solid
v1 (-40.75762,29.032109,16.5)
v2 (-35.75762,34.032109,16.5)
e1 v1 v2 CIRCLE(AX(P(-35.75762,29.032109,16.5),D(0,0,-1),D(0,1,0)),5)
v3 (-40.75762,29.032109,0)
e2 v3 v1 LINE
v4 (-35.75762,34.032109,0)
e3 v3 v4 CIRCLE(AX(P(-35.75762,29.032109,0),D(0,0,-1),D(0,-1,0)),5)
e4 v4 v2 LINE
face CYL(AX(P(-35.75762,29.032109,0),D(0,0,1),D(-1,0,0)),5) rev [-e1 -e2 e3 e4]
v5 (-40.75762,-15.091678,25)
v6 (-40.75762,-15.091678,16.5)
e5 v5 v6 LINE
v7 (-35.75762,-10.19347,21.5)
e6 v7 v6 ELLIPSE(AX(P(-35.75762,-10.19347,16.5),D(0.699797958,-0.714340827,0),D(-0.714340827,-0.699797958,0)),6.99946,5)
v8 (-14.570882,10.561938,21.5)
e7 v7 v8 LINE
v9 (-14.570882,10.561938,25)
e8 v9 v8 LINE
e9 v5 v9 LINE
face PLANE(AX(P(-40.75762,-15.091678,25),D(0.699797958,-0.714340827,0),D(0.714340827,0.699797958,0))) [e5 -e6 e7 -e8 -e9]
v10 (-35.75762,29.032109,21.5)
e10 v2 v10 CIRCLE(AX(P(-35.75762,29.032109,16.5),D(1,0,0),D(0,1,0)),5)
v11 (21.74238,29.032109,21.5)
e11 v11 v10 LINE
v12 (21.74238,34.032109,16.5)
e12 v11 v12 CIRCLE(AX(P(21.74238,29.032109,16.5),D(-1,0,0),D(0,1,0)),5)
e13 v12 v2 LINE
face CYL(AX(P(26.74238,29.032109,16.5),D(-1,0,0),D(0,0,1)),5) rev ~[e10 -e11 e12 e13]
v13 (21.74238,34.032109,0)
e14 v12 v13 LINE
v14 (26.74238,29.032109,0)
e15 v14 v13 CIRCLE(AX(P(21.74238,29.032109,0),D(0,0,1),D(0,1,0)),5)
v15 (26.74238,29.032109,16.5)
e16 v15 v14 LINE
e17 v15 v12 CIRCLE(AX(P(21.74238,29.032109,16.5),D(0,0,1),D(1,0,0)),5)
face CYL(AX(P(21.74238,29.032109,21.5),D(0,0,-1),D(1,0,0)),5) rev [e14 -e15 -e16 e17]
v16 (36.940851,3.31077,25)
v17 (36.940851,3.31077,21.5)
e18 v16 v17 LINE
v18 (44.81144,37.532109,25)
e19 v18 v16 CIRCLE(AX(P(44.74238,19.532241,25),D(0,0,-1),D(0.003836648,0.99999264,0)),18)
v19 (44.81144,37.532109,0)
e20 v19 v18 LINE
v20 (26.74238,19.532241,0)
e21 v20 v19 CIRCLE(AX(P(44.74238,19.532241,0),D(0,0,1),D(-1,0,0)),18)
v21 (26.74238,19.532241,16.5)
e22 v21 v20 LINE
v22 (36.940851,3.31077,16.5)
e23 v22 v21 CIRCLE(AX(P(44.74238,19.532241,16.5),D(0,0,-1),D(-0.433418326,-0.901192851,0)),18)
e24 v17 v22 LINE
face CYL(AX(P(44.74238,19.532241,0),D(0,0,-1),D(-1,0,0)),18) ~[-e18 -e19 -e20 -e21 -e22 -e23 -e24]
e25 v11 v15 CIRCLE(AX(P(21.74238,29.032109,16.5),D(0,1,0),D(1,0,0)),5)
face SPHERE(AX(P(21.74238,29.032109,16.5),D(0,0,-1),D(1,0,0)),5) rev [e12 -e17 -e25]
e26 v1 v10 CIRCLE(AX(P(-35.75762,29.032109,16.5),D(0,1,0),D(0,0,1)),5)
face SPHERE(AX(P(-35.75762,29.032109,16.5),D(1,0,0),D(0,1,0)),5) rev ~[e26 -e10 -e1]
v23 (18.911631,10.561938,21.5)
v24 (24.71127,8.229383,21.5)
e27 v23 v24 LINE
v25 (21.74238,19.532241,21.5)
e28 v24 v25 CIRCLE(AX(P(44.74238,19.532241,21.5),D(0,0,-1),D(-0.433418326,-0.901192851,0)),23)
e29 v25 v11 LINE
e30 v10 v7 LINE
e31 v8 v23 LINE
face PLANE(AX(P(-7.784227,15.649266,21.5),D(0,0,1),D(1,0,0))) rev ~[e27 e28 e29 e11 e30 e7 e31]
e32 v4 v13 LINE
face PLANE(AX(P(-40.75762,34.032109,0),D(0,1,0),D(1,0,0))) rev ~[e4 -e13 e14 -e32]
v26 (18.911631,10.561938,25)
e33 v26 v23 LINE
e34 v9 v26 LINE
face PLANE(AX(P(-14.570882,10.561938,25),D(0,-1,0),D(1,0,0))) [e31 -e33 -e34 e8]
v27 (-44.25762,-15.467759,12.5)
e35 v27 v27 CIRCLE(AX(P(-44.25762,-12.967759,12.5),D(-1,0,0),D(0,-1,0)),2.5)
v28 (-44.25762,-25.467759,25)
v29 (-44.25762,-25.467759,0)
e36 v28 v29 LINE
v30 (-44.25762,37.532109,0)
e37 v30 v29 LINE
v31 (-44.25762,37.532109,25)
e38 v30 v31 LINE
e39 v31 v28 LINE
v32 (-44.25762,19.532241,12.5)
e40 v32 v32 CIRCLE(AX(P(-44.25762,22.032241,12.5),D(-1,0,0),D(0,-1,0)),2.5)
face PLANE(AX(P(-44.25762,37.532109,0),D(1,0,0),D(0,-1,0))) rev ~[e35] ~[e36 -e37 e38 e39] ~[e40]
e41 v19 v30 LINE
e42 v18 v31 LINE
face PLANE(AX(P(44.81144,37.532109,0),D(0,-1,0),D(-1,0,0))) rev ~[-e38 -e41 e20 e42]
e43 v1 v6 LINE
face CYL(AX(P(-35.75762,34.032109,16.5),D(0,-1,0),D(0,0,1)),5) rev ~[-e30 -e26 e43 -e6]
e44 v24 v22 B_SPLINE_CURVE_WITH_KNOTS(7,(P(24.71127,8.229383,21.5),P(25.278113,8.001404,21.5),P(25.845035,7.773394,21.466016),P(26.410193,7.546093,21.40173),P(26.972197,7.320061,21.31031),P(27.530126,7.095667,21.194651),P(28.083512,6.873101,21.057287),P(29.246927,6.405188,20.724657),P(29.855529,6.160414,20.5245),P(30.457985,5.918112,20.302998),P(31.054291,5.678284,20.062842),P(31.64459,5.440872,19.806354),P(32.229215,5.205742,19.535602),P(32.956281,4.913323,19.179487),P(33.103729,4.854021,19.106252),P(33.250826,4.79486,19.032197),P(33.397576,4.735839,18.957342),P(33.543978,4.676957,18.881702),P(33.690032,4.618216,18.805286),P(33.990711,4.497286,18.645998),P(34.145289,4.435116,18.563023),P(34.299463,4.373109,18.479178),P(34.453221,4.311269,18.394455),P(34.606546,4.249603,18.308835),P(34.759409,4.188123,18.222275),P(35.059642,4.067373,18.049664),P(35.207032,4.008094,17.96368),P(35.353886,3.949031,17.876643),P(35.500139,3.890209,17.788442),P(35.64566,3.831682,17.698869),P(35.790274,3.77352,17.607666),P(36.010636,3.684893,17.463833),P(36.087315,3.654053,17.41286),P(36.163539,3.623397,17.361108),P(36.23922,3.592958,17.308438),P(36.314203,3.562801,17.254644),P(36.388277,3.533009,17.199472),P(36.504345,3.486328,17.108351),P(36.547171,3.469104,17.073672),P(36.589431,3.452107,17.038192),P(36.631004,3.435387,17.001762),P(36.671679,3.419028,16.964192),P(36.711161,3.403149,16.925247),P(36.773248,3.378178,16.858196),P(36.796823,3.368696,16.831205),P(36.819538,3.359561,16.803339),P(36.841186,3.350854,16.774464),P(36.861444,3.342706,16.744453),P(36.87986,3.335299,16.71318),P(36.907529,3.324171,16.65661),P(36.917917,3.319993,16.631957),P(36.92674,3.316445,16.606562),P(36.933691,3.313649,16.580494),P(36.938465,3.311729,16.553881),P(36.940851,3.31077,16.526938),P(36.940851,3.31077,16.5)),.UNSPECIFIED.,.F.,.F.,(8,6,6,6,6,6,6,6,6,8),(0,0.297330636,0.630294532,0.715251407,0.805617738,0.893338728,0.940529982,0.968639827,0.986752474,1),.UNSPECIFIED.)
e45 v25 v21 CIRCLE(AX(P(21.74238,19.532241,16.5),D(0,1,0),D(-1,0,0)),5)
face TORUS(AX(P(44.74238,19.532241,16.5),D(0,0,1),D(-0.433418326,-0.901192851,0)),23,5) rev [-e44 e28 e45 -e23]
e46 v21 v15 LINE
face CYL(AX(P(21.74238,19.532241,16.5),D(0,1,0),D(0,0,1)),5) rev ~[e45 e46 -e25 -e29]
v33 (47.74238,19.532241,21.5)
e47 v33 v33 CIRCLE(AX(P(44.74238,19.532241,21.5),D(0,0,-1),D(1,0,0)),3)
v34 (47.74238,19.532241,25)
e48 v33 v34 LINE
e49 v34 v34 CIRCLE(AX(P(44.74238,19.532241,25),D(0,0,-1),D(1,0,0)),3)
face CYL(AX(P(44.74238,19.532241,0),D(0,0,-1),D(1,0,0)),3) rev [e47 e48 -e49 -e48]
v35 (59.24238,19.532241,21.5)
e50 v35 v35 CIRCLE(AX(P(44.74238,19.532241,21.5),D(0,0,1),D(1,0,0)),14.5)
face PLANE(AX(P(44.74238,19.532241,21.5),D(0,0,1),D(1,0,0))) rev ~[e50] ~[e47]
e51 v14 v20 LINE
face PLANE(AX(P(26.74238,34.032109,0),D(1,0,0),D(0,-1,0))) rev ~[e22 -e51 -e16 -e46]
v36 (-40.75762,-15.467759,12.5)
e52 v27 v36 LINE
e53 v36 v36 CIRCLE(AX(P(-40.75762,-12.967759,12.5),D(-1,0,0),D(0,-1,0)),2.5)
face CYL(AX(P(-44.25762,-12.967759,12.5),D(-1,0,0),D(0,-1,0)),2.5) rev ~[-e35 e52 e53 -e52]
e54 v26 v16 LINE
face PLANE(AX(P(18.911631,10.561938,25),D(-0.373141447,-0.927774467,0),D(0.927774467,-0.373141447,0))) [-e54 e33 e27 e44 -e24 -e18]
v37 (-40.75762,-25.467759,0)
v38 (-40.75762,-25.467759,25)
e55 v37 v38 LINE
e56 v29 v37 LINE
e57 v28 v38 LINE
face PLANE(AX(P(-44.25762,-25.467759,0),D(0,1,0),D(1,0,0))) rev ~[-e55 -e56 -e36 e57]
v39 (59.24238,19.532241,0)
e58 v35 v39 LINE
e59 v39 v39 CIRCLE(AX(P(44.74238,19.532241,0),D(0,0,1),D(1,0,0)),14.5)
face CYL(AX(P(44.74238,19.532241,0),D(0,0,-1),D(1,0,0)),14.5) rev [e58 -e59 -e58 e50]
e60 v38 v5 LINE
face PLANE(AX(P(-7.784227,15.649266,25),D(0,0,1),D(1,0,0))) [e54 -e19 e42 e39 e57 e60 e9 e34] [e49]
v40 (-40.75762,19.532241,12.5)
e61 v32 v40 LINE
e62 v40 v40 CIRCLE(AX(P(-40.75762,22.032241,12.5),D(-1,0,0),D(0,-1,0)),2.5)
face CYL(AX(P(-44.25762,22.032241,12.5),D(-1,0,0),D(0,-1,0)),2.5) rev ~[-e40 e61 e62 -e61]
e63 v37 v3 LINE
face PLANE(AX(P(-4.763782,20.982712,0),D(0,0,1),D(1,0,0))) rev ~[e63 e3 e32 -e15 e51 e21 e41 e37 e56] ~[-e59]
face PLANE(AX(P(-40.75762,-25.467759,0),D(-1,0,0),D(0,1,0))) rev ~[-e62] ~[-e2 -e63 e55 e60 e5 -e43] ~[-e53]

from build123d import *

# Parameters (mm, degrees)
F0_R      = 14.5
F1_DEPTH  = 25
F2_R      = 14.5
F3_DEPTH  = 3
F4_R      = 2.5
F5_DEPTH  = 25
F0_R_2    = 3
F6_DEPTH  = 30
F8_DEPTH  = 25
F9_DEPTH  = 3.5
F10_DEPTH = 30
F11_R     = 5


# Not quite as in the source:
# - a feature names something its author has since deleted; it is built from what else it names


with BuildPart() as f1:
    # F0 (on Top) → F1 (new body)
    with BuildSketch(Plane.XY):
        with BuildLine():
            Line((-44.2576195002, 24.5322410017), (-44.2576195002, -25.4677589983))
            Line((-44.2576195002, -25.4677589983), (-40.7576195002, -25.4677589983))
            Line((-40.7576195002, -25.4677589983), (-40.7576195002, 34.0321085225))
            Line((-40.7576195002, 34.0321085225), (26.7423804998, 34.0321085225))
            Line((26.7423804998, 34.0321085225), (26.7423804998, 19.5322410017))
            ThreePointArc((26.7423804998, 19.5322410017), (57.445862821, 6.7799260387), (44.8114401571, 37.5321085225))
            Line((44.8114401571, 37.5321085225), (44.6733208426, 37.5321085225))
            Line((44.6733208426, 37.5321085225), (-44.2576195002, 37.5321085225))
            Line((-44.2576195002, 37.5321085225), (-44.2576195002, 24.5322410017))
        make_face()
        with Locations((44.7423804998, 19.5322410017)):
            Circle(F0_R, mode=Mode.SUBTRACT)
    extrude(amount=F1_DEPTH)

    # F2 (on face) → F3 (join)
    with BuildSketch(Plane.XY.offset(25)):
        with BuildLine():
            ThreePointArc((26.7423804998, 19.5322410017), (29.5038185973, 9.9517279079), (36.9408506267, 3.3107696863))
            ThreePointArc((36.9408506267, 3.3107696863), (62.2844095115, 15.4977375434), (44.8114401571, 37.5321085225))
            Line((44.8114401571, 37.5321085225), (-44.2576195002, 37.5321085225))
            Line((-44.2576195002, 37.5321085225), (-44.2576195002, -25.4677589983))
            Line((-44.2576195002, -25.4677589983), (-40.7576195002, -25.4677589983))
            Line((-40.7576195002, -25.4677589983), (-40.7576195002, -15.0916781276))
            Line((-40.7576195002, -15.0916781276), (-40.7576195002, 34.0321085225))
            Line((-40.7576195002, 34.0321085225), (26.7423804998, 34.0321085225))
            Line((26.7423804998, 34.0321085225), (26.7423804998, 19.5322410017))
        make_face()
        with Locations((44.7423804998, 19.5322410017)):
            Circle(F2_R, mode=Mode.SUBTRACT)
    extrude(amount=-F3_DEPTH)

    # F4 (on face) → F5 (cut)
    with BuildSketch(Plane(origin=(-44.2576195002, 0, 0), x_dir=(0, -1, 0), z_dir=(-1, 0, 0))):
        with Locations((12.9677589983, 12.5)):
            Circle(F4_R)
    extrude(amount=-F5_DEPTH, mode=Mode.SUBTRACT)

    # F0 (on Top) → F6 (cut)
    with BuildSketch(Plane.XY):
        with Locations((44.7423804998, 19.5322410017)):
            Circle(F0_R_2)
    extrude(amount=F6_DEPTH, mode=Mode.SUBTRACT)

    # F4 (on face) → F8 (cut)
    with BuildSketch(Plane(origin=(-44.2576195002, 0, 0), x_dir=(0, -1, 0), z_dir=(-1, 0, 0))):
        with Locations((-22.0322410017, 12.5)):
            Circle(F4_R)
    extrude(amount=-F8_DEPTH, mode=Mode.SUBTRACT)

    # F2 (on face) → F9 (join)
    with BuildSketch(Plane.XY.offset(25)):
        with BuildLine():
            Line((18.9116307646, 10.5619383976), (36.9408506267, 3.3107696863))
            ThreePointArc((36.9408506267, 3.3107696863), (29.5038185973, 9.9517279079), (26.7423804998, 19.5322410017))
            Line((26.7423804998, 19.5322410017), (26.7423804998, 34.0321085225))
            Line((26.7423804998, 34.0321085225), (-40.7576195002, 34.0321085225))
            Line((-40.7576195002, 34.0321085225), (-40.7576195002, -15.0916781276))
            Line((-40.7576195002, -15.0916781276), (-14.5708816946, 10.5619383976))
            Line((-14.5708816946, 10.5619383976), (18.9116307646, 10.5619383976))
        make_face()
        with Locations((44.7423804998, 19.5322410017)):
            Circle(F2_R)
    extrude(amount=-F9_DEPTH)

    # F0 (on Top) → F10 (cut)
    with BuildSketch(Plane.XY):
        with Locations((44.7423804998, 19.5322410017)):
            Circle(F0_R_2)
    extrude(amount=F10_DEPTH, mode=Mode.SUBTRACT)

    # F11
    f11_edges = [f1.edges().sort_by_distance(p)[0] for p in [
        (26.74238, 34.032109, 10.75),
        (26.74238, 26.782175, 21.5),
        (-7.00762, 34.032109, 21.5),
        (-40.75762, 34.032109, 10.75),
        (-40.75762, 9.470215, 21.5),
    ]]
    fillet(f11_edges, radius=F11_R)


solid = f1.part
